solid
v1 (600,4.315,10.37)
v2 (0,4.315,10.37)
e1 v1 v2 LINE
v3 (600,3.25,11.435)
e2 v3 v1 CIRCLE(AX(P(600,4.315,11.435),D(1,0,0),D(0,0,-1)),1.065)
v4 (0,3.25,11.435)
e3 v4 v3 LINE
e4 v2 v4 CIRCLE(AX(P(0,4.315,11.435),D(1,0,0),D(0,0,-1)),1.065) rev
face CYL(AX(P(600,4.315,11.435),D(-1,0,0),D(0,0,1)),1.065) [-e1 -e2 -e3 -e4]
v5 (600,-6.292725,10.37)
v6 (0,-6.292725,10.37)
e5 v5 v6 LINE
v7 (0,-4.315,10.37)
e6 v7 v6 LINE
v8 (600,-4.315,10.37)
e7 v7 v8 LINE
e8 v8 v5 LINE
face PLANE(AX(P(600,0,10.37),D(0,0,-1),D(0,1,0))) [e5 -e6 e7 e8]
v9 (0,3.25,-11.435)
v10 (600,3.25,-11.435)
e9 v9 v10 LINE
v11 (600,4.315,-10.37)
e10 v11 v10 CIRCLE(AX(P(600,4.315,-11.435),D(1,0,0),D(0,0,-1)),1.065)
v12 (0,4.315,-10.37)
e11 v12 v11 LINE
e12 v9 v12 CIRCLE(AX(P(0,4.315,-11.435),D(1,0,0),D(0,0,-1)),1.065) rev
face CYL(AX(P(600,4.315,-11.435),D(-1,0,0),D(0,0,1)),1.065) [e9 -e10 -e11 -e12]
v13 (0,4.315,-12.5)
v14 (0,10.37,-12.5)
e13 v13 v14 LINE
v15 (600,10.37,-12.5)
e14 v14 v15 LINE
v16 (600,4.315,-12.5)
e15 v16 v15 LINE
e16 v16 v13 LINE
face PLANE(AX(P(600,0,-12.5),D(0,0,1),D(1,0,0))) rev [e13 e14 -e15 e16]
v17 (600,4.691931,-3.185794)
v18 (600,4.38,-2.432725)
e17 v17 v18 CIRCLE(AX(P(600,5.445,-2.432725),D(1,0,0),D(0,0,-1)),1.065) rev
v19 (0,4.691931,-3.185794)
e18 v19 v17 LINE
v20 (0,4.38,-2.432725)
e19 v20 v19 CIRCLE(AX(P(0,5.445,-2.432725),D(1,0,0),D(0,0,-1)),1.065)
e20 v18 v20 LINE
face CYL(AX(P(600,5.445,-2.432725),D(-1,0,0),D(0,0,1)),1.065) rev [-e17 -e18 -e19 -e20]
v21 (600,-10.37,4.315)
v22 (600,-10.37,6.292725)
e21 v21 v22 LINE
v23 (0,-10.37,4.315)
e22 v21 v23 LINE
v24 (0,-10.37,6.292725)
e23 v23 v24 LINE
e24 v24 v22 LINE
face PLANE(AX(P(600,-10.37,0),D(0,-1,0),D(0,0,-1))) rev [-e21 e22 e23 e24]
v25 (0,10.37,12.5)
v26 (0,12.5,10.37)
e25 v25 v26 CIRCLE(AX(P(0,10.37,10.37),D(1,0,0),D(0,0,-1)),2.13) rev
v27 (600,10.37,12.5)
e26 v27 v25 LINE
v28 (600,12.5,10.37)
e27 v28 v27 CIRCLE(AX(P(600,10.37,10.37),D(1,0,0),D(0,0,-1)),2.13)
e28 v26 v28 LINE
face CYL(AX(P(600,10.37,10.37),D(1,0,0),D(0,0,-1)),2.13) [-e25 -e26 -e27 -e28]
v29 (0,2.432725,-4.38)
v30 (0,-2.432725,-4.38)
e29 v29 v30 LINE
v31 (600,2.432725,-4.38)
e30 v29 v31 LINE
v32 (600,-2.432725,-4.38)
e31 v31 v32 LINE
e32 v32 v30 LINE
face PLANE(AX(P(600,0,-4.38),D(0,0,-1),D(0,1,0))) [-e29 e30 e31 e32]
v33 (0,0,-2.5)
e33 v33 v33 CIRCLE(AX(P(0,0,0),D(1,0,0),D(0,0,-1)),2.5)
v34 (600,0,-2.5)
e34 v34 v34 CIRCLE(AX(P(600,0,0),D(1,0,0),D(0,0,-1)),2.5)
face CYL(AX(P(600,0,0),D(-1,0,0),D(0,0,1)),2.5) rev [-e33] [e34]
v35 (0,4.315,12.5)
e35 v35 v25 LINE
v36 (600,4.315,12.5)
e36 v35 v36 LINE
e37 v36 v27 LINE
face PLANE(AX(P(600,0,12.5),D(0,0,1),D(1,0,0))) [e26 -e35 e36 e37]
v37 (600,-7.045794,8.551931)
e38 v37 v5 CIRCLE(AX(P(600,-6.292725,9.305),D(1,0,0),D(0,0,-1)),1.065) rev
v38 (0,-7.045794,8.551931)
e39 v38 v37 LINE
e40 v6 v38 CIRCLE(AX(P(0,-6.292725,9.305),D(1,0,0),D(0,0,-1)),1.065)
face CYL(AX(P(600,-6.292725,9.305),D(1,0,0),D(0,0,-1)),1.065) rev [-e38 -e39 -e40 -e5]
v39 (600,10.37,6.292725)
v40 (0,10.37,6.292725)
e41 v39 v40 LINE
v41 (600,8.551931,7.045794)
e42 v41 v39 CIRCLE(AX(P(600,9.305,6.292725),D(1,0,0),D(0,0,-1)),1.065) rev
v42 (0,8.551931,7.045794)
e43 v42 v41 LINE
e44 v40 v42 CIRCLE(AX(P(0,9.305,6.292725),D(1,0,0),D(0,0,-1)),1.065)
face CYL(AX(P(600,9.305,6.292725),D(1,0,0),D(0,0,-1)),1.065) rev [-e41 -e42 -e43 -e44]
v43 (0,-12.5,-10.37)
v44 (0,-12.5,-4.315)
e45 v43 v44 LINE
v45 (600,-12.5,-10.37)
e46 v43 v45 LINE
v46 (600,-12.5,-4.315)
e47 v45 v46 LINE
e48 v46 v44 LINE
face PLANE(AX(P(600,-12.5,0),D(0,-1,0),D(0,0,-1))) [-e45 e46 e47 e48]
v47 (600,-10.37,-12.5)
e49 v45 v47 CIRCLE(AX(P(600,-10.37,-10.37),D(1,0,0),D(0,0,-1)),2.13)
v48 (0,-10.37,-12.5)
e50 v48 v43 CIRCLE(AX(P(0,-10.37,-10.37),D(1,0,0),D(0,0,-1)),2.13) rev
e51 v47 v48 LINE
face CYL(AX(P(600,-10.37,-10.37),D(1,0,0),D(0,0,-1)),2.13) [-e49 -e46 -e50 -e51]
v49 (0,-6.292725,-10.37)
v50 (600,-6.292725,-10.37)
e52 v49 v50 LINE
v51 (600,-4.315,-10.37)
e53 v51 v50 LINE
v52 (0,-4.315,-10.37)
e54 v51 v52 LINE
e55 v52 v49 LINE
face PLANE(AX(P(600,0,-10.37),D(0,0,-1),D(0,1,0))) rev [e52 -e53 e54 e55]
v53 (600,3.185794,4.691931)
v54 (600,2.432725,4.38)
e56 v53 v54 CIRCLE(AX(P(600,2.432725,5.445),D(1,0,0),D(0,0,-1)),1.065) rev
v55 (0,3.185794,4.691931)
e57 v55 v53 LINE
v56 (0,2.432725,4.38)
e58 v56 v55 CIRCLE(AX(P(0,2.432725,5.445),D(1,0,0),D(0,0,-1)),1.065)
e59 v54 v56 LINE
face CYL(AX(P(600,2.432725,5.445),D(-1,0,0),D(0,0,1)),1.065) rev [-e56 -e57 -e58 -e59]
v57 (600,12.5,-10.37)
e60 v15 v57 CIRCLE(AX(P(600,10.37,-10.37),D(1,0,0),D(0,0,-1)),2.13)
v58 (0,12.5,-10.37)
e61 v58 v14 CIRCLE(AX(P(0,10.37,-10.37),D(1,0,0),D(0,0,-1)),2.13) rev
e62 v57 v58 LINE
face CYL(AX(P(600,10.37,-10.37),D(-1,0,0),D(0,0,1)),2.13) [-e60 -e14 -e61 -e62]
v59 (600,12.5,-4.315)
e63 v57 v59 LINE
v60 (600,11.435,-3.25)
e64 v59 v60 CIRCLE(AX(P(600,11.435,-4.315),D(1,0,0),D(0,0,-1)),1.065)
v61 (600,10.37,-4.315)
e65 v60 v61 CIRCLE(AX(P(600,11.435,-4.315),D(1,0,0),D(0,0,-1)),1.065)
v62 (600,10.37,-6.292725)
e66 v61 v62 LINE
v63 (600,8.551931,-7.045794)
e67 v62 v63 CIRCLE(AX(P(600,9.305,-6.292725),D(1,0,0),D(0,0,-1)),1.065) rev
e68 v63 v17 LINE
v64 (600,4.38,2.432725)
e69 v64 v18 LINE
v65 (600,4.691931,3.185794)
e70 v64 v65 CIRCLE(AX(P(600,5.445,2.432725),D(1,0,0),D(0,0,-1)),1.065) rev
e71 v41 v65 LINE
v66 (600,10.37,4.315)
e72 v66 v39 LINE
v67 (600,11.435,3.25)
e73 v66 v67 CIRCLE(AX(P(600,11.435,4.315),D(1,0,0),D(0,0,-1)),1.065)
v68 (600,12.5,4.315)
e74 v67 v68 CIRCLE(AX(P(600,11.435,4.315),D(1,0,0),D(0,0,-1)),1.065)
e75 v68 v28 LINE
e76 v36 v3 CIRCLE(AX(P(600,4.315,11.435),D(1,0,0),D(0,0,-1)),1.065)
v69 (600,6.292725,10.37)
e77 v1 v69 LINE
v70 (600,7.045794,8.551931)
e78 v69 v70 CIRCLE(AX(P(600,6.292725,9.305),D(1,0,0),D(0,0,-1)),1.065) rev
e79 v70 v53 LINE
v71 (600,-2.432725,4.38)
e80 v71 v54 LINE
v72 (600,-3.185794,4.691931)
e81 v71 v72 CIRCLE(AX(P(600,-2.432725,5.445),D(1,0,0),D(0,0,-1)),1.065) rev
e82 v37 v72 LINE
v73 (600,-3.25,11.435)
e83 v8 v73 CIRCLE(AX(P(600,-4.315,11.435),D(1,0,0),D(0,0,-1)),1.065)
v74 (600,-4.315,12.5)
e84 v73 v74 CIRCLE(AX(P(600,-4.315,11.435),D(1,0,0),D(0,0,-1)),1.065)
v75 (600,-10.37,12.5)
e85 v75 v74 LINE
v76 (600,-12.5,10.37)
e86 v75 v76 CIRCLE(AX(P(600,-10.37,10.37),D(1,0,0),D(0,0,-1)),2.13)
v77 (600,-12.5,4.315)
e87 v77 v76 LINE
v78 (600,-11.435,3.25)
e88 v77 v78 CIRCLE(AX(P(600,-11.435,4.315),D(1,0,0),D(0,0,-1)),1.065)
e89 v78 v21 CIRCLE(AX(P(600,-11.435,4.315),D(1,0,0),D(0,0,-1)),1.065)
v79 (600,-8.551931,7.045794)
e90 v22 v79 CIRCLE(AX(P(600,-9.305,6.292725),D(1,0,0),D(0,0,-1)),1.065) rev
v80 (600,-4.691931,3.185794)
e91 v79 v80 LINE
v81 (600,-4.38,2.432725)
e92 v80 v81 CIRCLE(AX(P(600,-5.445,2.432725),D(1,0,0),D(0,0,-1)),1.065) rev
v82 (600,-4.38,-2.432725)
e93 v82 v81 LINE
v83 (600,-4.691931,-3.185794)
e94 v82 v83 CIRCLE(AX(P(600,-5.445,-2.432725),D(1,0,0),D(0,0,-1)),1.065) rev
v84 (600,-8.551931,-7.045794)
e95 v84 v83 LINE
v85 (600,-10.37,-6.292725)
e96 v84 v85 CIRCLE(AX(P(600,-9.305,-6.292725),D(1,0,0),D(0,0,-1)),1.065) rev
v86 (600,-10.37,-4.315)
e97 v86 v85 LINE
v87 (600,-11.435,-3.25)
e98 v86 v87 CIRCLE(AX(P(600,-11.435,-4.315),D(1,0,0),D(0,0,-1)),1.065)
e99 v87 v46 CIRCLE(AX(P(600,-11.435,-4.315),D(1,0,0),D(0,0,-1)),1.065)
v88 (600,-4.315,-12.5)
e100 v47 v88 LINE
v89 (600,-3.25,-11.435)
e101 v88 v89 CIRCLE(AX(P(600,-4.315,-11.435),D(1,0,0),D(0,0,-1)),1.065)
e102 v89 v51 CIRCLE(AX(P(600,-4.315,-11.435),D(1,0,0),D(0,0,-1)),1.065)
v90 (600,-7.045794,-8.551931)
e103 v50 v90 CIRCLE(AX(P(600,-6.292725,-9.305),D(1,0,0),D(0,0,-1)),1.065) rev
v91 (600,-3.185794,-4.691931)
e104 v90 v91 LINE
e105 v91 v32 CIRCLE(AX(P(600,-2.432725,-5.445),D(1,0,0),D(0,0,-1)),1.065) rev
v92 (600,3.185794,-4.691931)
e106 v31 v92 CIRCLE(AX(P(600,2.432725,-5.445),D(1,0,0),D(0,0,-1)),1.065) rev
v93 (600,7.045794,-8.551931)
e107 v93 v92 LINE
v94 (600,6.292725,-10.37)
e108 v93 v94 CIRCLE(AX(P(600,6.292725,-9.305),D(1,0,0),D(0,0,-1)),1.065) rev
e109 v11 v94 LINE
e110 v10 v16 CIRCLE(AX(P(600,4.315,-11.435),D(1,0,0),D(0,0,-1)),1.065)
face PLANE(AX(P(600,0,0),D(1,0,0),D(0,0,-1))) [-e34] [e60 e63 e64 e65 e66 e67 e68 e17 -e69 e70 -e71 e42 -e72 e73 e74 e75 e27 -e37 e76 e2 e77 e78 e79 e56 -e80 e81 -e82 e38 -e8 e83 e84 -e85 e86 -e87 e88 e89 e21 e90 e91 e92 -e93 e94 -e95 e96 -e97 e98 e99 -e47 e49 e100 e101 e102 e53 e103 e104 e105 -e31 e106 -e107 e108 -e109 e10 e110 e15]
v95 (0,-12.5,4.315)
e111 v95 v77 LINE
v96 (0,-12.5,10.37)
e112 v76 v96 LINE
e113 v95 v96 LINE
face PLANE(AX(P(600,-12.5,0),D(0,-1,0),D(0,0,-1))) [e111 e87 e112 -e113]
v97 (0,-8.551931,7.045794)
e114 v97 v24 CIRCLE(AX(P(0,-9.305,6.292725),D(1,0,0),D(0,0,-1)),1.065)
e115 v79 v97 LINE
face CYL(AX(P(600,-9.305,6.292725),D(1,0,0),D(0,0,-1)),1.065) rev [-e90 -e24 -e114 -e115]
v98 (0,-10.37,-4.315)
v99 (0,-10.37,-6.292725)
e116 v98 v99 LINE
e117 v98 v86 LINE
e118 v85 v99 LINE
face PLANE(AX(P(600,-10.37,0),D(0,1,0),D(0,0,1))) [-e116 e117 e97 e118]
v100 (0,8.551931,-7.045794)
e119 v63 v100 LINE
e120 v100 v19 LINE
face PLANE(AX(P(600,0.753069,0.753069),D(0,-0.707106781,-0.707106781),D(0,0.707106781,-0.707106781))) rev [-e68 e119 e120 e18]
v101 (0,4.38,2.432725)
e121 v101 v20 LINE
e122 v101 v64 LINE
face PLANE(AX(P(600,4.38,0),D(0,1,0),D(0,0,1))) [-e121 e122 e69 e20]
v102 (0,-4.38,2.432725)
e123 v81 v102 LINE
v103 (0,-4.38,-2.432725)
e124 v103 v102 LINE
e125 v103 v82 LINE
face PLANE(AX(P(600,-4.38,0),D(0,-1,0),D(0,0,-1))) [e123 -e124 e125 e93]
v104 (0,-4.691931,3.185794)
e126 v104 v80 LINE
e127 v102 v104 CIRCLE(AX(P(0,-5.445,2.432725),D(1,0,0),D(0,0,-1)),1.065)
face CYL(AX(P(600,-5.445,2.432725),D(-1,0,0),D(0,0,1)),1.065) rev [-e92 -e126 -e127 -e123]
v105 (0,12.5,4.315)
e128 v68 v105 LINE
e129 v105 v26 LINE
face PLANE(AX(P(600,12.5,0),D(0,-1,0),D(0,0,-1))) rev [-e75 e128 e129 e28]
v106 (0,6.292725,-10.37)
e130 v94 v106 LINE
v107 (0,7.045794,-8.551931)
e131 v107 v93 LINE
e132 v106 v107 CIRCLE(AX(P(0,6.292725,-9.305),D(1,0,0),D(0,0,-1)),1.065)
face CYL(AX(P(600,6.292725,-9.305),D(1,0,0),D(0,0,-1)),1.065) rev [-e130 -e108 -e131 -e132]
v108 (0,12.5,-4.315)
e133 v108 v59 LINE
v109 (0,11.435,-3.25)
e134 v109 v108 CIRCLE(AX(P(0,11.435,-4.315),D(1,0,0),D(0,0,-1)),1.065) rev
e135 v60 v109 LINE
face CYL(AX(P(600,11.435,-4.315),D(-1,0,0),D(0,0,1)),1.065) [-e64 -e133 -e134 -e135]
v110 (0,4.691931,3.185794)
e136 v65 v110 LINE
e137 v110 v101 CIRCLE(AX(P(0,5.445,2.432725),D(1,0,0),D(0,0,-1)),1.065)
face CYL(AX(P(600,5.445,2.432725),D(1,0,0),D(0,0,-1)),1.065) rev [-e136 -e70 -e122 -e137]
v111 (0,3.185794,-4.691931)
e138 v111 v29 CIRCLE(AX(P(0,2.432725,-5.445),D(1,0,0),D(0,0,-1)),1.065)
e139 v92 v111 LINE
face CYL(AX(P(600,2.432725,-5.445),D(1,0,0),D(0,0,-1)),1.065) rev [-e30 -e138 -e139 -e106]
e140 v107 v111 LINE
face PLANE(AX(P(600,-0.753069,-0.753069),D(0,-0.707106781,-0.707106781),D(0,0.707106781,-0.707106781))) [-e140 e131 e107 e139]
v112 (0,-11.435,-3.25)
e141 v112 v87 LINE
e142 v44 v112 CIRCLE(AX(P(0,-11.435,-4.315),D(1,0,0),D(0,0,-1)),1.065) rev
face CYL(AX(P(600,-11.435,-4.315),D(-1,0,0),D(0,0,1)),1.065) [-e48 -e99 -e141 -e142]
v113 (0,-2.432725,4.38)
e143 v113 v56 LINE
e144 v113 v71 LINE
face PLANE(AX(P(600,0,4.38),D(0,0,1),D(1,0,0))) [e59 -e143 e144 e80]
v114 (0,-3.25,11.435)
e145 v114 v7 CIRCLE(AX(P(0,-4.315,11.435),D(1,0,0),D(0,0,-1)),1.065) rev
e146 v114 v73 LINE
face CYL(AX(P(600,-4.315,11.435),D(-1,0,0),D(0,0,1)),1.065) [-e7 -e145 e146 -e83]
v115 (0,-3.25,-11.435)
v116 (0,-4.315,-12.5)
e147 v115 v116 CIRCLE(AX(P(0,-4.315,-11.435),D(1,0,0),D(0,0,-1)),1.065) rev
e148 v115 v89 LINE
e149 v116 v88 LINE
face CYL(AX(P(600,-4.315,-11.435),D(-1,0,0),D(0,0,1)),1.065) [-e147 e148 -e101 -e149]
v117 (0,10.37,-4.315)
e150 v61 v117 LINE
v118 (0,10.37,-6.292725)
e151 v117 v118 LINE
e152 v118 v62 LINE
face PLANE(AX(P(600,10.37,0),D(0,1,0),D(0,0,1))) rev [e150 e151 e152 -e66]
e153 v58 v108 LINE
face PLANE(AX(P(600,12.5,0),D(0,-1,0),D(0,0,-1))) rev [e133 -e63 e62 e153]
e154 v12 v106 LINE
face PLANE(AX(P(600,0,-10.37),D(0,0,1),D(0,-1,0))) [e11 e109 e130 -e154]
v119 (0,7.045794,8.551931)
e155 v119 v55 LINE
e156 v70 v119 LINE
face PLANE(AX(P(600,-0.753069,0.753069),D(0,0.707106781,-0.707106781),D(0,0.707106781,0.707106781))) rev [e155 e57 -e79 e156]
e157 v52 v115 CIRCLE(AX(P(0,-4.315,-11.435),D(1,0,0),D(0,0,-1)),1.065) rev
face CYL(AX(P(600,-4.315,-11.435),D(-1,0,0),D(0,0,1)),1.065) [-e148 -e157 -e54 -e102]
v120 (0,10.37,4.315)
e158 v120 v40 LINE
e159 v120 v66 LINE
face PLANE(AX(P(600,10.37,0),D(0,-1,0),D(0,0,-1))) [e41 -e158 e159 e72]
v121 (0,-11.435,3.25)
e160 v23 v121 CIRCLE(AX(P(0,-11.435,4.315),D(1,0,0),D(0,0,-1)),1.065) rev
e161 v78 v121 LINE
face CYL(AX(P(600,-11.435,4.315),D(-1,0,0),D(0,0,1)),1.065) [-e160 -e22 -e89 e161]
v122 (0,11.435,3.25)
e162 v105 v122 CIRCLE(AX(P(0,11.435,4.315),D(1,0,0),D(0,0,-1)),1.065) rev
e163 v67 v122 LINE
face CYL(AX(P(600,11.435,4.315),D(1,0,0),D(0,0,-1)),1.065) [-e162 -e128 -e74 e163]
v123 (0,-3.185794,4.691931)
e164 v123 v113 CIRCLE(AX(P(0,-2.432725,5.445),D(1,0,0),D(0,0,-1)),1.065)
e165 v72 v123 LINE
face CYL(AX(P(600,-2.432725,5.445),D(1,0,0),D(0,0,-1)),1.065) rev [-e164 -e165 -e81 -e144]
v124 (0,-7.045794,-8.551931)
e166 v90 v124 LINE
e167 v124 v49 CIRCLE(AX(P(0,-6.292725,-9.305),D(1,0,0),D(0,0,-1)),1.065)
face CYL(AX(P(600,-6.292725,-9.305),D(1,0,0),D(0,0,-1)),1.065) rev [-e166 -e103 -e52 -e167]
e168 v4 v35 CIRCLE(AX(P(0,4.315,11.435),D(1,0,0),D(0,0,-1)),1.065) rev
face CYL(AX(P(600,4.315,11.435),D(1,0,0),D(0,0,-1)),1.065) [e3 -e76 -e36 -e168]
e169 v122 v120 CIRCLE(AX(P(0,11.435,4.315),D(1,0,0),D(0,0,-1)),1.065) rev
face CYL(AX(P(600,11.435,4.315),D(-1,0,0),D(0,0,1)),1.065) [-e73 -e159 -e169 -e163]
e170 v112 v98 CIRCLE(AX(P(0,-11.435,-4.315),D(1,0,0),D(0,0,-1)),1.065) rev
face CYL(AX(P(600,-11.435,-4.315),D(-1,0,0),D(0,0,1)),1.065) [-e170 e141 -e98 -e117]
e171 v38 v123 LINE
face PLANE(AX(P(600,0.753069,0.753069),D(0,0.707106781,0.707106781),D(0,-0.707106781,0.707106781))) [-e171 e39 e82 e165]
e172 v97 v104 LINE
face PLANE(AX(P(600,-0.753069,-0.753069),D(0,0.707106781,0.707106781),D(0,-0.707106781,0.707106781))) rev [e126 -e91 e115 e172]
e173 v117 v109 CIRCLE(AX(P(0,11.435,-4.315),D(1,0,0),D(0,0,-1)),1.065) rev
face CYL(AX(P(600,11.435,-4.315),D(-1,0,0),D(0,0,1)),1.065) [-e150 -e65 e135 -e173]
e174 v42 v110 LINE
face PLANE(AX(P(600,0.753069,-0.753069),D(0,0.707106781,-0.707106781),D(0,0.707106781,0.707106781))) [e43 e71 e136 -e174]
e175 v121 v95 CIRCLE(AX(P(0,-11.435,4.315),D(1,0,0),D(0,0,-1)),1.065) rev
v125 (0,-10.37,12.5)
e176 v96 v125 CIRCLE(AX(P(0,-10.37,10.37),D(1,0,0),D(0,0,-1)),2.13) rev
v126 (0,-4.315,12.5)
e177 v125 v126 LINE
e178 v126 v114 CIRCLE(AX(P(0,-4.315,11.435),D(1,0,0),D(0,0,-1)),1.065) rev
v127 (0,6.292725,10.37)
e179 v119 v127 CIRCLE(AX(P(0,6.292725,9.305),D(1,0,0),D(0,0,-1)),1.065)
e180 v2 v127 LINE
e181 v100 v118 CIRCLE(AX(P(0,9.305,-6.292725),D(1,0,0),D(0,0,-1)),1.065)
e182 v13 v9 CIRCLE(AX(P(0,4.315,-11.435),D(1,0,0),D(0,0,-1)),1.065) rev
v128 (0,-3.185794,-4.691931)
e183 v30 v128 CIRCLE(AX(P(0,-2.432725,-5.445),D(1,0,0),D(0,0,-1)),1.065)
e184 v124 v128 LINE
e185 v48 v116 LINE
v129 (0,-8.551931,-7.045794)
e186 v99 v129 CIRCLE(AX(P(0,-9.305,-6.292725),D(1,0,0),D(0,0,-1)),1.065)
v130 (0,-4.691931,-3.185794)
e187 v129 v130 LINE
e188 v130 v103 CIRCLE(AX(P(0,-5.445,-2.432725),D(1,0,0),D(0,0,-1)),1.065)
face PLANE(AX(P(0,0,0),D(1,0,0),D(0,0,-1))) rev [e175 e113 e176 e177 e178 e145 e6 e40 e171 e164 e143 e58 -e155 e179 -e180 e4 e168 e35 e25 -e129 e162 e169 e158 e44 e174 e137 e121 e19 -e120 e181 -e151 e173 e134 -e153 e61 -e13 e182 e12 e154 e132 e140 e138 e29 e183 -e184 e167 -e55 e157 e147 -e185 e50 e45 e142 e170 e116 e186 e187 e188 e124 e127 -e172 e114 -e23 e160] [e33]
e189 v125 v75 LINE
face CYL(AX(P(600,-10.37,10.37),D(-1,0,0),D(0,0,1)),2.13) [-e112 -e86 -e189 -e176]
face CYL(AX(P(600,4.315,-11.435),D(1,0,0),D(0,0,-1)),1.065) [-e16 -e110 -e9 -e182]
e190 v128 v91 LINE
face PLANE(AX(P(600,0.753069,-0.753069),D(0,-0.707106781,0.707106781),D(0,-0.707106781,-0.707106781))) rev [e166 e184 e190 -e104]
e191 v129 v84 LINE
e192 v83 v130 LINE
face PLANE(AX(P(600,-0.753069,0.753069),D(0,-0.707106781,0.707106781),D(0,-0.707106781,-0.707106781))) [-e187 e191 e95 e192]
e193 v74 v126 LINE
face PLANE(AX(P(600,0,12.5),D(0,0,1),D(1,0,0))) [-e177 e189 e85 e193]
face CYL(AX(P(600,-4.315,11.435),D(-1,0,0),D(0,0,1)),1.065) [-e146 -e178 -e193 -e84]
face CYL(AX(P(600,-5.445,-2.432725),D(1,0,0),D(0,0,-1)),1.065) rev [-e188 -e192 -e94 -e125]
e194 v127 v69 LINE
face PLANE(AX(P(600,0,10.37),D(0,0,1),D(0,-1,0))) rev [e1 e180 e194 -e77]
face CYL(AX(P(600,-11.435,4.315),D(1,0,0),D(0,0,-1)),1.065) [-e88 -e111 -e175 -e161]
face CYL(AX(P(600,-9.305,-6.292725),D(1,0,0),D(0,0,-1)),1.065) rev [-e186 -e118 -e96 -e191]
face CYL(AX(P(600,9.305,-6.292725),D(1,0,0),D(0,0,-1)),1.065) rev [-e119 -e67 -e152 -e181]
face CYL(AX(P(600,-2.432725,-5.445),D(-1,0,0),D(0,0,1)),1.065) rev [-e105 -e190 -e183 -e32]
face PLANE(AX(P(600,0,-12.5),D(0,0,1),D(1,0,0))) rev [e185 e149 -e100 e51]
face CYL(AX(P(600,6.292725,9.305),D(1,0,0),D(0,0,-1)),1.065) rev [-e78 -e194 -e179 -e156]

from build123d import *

# Parameters (mm, degrees)
SKETCH1_R           = 2.5
BOSS_EXTRUDE1_DEPTH = 600
FILLET1_R           = 1.065
FILLET2_R           = 2.13


with BuildPart() as part:
    # Sketch1 → Boss-Extrude1 (new body)
    with BuildSketch(Plane.YZ):
        Polygon((-12.5, -3.25), (-12.5, -12.5), (-3.25, -12.5), (-3.25, -10.37), (-8.863862556, -10.37), (-2.873862556, -4.38), (2.873862556, -4.38), (8.863862556, -10.37), (3.25, -10.37), (3.25, -12.5), (12.5, -12.5), (12.5, -3.25), (10.37, -3.25), (10.37, -8.863862556), (4.38, -2.873862556), (4.38, 2.873862556), (10.37, 8.863862556), (10.37, 3.25), (12.5, 3.25), (12.5, 12.5), (3.25, 12.5), (3.25, 10.37), (8.863862556, 10.37), (2.873862556, 4.38), (-2.873862556, 4.38), (-8.863862556, 10.37), (-3.25, 10.37), (-3.25, 12.5), (-12.5, 12.5), (-12.5, 3.25), (-10.37, 3.25), (-10.37, 8.863862556), (-4.38, 2.873862556), (-4.38, -2.873862556), (-10.37, -8.863862556), (-10.37, -3.25), align=None)
        with Locations(Location((0, 0, 0), (0, 0, 270))):
            Circle(SKETCH1_R, mode=Mode.SUBTRACT)
    extrude(amount=BOSS_EXTRUDE1_DEPTH)

    # Fillet1
    fillet1_edges = [part.edges().sort_by_distance(p)[0] for p in [
        (300, -10.37, -8.863862556),
        (300, 2.873862556, -4.38),
        (300, -2.873862556, -4.38),
        (300, -4.38, 2.873862556),
        (300, -4.38, -2.873862556),
        (300, -2.873862556, 4.38),
        (300, 2.873862556, 4.38),
        (300, 4.38, 2.873862556),
        (300, 4.38, -2.873862556),
        (300, -8.863862556, -10.37),
        (300, 8.863862556, -10.37),
        (300, 10.37, -8.863862556),
        (300, -10.37, 8.863862556),
        (300, -8.863862556, 10.37),
        (300, 10.37, 8.863862556),
        (300, 8.863862556, 10.37),
        (300, 12.5, 3.25),
        (300, -3.25, -12.5),
        (300, -10.37, 3.25),
        (300, 10.37, 3.25),
        (300, -10.37, -3.25),
        (300, -12.5, -3.25),
        (300, -12.5, 3.25),
        (300, 3.25, -10.37),
        (300, -3.25, -10.37),
        (300, 3.25, -12.5),
        (300, 10.37, -3.25),
        (300, 12.5, -3.25),
        (300, 3.25, 12.5),
        (300, 3.25, 10.37),
        (300, -3.25, 10.37),
        (300, -3.25, 12.5),
    ]]
    fillet(fillet1_edges, radius=FILLET1_R - 0.0001)  # a hair under: the kernel refuses the full size

    # Fillet2
    fillet2_edges = [part.edges().sort_by_distance(p)[0] for p in [
        (300, -12.5, 12.5),
        (300, 12.5, 12.5),
        (300, 12.5, -12.5),
        (300, -12.5, -12.5),
    ]]
    fillet(fillet2_edges, radius=FILLET2_R)


solid = part.part
